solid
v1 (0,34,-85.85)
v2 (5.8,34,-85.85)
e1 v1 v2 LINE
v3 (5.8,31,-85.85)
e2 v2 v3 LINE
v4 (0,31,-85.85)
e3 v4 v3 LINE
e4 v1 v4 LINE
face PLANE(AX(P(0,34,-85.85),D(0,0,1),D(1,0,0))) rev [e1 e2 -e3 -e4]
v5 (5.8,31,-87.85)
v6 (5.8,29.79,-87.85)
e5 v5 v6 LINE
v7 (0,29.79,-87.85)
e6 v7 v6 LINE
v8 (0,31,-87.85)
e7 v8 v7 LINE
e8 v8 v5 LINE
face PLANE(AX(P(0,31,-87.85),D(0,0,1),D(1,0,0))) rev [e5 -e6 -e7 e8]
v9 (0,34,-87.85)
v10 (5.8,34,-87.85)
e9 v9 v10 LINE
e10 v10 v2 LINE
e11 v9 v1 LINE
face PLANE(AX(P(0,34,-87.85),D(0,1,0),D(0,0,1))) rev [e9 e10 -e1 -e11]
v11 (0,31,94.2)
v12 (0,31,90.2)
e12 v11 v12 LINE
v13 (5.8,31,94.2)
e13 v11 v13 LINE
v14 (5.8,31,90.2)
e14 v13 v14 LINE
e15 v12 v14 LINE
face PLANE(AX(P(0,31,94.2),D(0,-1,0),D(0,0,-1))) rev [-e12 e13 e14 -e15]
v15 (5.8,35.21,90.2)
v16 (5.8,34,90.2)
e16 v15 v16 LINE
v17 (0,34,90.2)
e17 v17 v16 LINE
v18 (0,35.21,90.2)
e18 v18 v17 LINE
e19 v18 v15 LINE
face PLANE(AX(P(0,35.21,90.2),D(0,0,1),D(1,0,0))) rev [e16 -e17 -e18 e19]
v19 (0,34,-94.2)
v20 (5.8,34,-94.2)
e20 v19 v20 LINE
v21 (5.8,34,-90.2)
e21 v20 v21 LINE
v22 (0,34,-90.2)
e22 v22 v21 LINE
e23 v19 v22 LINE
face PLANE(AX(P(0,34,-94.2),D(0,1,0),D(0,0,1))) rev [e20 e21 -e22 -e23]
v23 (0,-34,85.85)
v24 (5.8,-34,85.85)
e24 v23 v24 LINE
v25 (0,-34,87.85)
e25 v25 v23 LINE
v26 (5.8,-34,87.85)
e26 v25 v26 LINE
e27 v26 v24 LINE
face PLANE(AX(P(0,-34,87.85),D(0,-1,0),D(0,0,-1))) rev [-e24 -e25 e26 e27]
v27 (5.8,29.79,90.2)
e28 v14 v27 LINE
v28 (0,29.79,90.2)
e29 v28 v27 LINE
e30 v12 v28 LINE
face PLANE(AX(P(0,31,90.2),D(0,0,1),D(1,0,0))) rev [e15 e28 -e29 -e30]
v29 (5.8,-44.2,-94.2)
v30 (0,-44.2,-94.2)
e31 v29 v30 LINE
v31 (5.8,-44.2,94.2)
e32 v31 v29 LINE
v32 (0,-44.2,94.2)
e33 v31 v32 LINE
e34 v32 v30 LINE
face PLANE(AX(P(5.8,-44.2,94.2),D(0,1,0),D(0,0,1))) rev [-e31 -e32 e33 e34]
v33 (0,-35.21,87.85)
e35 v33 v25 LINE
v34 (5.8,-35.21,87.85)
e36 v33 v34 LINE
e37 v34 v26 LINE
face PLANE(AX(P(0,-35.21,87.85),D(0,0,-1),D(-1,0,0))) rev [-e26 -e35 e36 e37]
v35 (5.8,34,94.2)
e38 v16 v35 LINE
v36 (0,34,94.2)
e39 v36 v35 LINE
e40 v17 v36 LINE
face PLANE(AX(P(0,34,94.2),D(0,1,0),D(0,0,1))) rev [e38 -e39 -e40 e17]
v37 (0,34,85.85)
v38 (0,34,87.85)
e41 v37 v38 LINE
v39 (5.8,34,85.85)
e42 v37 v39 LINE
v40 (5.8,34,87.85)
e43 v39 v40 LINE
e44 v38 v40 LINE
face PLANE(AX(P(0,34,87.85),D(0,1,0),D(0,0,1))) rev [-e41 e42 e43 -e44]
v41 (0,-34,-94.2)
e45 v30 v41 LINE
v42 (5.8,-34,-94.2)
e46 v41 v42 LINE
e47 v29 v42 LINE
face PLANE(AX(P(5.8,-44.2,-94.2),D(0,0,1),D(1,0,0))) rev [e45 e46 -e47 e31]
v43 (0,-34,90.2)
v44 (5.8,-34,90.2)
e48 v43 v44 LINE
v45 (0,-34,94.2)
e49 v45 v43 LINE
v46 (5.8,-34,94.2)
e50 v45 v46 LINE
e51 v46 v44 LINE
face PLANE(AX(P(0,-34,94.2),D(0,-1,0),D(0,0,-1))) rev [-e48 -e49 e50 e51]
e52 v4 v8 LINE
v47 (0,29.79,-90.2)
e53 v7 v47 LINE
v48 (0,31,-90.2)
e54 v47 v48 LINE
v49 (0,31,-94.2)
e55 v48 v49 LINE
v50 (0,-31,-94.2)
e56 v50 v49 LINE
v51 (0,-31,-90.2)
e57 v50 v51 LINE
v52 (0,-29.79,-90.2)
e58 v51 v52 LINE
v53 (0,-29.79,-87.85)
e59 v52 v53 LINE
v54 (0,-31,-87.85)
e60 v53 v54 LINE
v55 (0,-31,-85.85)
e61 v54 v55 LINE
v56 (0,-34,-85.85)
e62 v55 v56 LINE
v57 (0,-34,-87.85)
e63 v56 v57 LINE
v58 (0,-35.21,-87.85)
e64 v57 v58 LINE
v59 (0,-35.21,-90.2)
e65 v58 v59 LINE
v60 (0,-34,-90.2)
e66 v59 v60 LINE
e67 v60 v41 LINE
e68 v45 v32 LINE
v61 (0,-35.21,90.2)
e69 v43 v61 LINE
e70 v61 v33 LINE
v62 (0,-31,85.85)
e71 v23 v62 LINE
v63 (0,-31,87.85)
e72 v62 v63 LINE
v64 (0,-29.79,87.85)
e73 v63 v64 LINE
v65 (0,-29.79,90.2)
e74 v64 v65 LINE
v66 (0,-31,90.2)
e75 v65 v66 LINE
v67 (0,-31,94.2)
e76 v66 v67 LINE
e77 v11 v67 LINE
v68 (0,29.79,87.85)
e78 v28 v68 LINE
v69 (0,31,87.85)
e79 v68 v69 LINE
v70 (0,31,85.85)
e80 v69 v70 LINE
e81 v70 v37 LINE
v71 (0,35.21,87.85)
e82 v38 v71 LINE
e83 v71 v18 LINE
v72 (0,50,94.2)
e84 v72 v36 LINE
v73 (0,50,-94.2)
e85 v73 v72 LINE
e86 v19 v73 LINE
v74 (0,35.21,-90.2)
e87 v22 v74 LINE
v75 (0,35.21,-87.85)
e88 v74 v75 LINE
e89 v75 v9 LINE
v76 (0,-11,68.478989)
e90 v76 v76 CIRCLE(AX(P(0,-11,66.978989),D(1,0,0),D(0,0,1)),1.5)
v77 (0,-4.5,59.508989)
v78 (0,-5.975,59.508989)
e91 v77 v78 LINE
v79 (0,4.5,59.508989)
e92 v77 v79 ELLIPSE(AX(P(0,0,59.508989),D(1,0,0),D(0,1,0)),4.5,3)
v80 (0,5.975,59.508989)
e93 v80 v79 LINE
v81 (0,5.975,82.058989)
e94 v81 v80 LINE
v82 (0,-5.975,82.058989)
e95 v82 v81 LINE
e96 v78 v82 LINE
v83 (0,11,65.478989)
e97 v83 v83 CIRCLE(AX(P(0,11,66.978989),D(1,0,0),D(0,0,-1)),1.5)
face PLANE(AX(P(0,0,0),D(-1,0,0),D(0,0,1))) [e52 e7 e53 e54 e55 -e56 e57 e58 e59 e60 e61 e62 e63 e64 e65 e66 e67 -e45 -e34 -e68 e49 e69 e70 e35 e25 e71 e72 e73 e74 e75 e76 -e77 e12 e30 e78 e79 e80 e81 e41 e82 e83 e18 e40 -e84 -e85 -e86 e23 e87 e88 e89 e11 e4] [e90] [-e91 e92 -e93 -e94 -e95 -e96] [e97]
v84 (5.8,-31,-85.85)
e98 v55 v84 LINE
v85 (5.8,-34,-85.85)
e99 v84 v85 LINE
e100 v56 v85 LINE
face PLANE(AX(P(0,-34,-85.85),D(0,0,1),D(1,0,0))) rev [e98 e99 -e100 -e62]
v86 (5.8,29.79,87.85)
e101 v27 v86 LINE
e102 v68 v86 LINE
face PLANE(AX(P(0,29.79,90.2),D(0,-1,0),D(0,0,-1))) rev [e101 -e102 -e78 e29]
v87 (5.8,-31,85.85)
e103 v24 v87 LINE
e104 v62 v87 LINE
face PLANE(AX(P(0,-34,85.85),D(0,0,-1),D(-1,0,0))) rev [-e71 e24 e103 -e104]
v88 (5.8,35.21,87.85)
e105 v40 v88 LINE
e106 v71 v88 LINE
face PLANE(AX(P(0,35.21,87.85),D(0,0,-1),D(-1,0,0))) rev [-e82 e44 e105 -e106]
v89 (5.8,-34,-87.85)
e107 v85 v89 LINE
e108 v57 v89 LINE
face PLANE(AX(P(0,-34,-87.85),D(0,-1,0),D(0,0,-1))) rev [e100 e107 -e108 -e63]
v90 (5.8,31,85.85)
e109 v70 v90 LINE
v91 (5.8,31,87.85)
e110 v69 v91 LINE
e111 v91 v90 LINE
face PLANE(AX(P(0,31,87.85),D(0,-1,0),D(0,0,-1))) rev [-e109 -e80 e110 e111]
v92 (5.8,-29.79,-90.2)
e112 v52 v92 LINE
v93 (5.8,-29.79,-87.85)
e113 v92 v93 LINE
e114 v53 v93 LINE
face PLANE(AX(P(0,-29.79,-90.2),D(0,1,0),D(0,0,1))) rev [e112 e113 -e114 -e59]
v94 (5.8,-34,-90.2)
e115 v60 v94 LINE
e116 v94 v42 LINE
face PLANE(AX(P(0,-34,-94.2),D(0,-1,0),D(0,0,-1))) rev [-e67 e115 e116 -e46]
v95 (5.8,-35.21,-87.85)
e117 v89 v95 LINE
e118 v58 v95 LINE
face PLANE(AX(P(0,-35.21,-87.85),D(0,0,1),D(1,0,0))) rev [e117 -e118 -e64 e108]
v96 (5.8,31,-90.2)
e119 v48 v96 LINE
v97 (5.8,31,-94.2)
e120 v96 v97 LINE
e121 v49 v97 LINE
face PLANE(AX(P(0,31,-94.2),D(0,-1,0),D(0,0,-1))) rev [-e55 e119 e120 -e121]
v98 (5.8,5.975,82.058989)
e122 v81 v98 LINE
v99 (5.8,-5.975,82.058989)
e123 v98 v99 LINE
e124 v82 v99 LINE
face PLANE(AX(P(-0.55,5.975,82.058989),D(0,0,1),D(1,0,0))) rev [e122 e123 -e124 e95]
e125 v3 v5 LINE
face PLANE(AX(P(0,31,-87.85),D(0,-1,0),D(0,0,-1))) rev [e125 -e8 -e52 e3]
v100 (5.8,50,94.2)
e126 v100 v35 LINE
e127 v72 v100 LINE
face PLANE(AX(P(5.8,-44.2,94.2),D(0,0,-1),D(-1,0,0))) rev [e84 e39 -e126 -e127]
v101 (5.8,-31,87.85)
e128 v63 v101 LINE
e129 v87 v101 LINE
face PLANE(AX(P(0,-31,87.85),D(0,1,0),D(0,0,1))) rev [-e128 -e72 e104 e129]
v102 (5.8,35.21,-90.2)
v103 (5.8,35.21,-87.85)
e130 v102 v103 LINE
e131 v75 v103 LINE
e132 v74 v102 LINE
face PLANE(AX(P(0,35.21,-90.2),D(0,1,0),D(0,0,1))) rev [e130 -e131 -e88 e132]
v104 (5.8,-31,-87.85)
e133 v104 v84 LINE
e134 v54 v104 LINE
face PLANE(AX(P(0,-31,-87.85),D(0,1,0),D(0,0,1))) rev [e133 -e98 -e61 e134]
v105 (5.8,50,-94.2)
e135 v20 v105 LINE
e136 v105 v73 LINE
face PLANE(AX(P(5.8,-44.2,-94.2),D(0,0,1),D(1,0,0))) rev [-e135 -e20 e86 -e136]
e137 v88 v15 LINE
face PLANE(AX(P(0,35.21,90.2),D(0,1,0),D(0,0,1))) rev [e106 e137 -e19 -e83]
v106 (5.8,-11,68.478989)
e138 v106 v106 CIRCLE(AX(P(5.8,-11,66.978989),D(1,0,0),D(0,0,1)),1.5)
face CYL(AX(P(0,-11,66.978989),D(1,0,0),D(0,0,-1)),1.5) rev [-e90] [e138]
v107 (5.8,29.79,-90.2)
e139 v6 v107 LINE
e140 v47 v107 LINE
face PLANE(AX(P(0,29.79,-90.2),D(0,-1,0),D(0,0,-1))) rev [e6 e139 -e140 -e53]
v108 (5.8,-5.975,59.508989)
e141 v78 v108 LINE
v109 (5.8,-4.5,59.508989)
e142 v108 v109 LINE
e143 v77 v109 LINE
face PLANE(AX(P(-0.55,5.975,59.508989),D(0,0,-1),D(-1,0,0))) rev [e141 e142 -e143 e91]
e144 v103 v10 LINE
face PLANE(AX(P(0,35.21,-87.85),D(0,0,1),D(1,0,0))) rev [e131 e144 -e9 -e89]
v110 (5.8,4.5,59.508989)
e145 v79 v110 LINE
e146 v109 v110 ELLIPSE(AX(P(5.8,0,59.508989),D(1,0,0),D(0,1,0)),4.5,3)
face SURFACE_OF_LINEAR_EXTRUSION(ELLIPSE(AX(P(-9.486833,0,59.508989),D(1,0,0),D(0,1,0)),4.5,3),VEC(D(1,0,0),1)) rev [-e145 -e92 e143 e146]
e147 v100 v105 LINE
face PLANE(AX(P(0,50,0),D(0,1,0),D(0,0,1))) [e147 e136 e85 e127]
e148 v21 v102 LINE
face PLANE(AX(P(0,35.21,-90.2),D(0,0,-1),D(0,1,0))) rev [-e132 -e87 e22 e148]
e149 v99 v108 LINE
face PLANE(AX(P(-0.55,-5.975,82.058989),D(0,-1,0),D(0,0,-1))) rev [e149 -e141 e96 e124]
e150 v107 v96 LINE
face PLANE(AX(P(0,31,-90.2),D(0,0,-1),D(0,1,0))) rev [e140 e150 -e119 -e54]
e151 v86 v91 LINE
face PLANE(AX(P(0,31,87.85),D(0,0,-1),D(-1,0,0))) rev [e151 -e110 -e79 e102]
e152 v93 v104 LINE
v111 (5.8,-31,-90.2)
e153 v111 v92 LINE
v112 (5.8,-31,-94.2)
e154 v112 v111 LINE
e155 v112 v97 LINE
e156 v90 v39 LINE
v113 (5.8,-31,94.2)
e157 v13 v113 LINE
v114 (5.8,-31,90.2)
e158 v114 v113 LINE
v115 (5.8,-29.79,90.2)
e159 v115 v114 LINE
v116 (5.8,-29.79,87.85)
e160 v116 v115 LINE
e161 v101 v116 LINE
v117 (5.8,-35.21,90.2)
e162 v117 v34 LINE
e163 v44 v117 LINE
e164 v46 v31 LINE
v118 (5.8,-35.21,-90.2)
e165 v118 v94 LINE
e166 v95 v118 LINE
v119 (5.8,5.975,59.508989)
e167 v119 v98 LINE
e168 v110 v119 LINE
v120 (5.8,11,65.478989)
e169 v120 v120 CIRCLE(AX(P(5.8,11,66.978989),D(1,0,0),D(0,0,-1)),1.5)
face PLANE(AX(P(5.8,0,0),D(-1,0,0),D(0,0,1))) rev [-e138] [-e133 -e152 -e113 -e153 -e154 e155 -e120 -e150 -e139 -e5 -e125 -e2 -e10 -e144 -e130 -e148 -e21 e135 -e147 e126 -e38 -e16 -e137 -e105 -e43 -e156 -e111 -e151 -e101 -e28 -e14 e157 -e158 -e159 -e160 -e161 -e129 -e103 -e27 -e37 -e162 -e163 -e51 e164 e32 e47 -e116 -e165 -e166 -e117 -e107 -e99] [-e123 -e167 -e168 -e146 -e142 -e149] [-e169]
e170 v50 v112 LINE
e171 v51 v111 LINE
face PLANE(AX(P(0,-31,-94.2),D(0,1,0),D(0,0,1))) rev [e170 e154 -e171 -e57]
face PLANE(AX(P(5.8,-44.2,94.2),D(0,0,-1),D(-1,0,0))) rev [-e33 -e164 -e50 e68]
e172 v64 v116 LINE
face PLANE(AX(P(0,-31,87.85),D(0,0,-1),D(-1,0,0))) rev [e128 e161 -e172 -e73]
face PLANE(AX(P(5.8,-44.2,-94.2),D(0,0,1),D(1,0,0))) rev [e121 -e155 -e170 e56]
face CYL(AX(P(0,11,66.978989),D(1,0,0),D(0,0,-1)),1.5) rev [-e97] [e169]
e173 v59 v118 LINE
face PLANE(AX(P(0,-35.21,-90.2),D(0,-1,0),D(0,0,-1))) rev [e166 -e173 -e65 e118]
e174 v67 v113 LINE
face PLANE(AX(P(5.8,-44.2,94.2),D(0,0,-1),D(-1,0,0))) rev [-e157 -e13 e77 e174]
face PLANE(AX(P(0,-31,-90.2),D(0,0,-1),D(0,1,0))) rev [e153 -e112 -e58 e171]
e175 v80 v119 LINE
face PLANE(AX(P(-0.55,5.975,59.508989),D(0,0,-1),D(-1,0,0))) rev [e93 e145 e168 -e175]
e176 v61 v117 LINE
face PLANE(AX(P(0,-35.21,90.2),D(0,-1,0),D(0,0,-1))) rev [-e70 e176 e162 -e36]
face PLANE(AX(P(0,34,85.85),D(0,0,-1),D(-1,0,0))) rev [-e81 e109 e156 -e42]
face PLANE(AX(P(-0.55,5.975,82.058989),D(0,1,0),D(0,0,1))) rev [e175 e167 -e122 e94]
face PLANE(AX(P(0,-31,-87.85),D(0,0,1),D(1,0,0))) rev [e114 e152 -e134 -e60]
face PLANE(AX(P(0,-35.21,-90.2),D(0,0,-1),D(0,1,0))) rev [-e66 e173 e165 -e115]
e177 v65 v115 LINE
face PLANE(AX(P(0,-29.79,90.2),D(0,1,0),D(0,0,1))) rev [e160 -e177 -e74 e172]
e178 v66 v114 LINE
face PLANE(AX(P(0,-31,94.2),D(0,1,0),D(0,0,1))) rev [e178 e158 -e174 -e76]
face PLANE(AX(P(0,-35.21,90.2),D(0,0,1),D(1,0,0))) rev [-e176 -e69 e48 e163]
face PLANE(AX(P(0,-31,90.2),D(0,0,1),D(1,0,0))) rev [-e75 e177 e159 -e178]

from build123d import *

# Parameters (mm, degrees)
BOSS_EXTRUDE1_OUTLINE_W   = 188.4
BOSS_EXTRUDE1_OUTLINE_H   = 88.4
BOSS_EXTRUDE1_DEPTH       = 5.8
BOSS_EXTRUDE1_2_OUTLINE_R = 1.5
BOSS_EXTRUDE1_2_OUTLINE_W = 22.55
BOSS_EXTRUDE1_2_OUTLINE_H = 11.95
BOSS_EXTRUDE1_2_DEPTH     = 5.8
SKETCH2_W                 = 22.55
SKETCH2_H                 = 11.95
CUT_EXTRUDE1_DEPTH        = 6.35
SKETCH3_R                 = 1.5
SKETCH3_W                 = 22.55
SKETCH3_H                 = 11.95
CUT_EXTRUDE2_DEPTH        = 107.804868803
CUT_EXTRUDE3_DEPTH        = 107.804868803
SKETCH5_W                 = 5.8
SKETCH5_H                 = 188.4
BOSS_EXTRUDE2_DEPTH       = 5.8
CUT_EXTRUDE5_DEPTH        = 5.8


# Read off the part's stored shape, not the designer's step: Boss-Extrude1
with BuildPart() as part:
    # Boss-Extrude1 outline → Boss-Extrude1 (new body)
    with BuildSketch(Plane(origin=(0, 0, 0), x_dir=(0, 0, -1), z_dir=(1, 0, 0))):
        Rectangle(BOSS_EXTRUDE1_OUTLINE_W, BOSS_EXTRUDE1_OUTLINE_H)
    extrude(amount=BOSS_EXTRUDE1_DEPTH)

    # Sketch2 → Cut-Extrude1 (cut)
    with BuildSketch(Plane(origin=(5.8, 0, 0), x_dir=(0, 0, -1), z_dir=(1, 0, 0))):
        with Locations((-70.783988916, 0)):
            Rectangle(SKETCH2_W, SKETCH2_H)
    extrude(amount=-CUT_EXTRUDE1_DEPTH, mode=Mode.SUBTRACT)

    # Sketch3 → Cut-Extrude2 (cut, through all)
    with BuildSketch(Plane(origin=(5.8, 0, 0), x_dir=(0, 0, -1), z_dir=(1, 0, 0))):
        with Locations((-66.978988916, 11)):
            Circle(SKETCH3_R)
        with Locations(Location((-66.978988916, -11, 0), (0, 0, 180))):
            Circle(SKETCH3_R)
        with Locations((-70.783988916, 0)):
            Rectangle(SKETCH3_W, SKETCH3_H)
    extrude(amount=-CUT_EXTRUDE2_DEPTH, mode=Mode.SUBTRACT)

    # Sketch4 → Cut-Extrude3 (cut, through all)
    with BuildSketch(Plane(origin=(5.8, 0, 0), x_dir=(0, 0, -1), z_dir=(1, 0, 0))):
        Polygon((-94.2, 34), (-90.2, 34), (-90.2, 35.21), (-87.85, 35.21), (-87.85, 34), (-85.85, 34), (-85.85, 31), (-87.85, 31), (-87.85, 29.79), (-90.2, 29.79), (-90.2, 31), (-94.2, 31), align=None)
        Polygon((-87.85, -31), (-87.85, -29.79), (-90.2, -29.79), (-90.2, -31), (-94.2, -31), (-94.2, -34), (-90.2, -34), (-90.2, -35.21), (-87.85, -35.21), (-87.85, -34), (-85.85, -34), (-85.85, -31), align=None)
        Polygon((94.2, -34), (90.2, -34), (90.2, -35.21), (87.85, -35.21), (87.85, -34), (85.85, -34), (85.85, -31), (87.85, -31), (87.85, -29.79), (90.2, -29.79), (90.2, -31), (94.2, -31), align=None)
        Polygon((87.85, 31), (87.85, 29.79), (90.2, 29.79), (90.2, 31), (94.2, 31), (94.2, 34), (90.2, 34), (90.2, 35.21), (87.85, 35.21), (87.85, 34), (85.85, 34), (85.85, 31), align=None)
    extrude(amount=-CUT_EXTRUDE3_DEPTH, mode=Mode.SUBTRACT)



with BuildPart() as body_2:
    # Boss-Extrude1 2 outline → Boss-Extrude1 2 (new body)
    with BuildSketch(Plane(origin=(0, 0, 0), x_dir=(0, 0, -1), z_dir=(1, 0, 0))):
        Polygon((94.2, 34), (94.2, 50), (-94.2, 50), (-94.2, 34), (-90.2, 34), (-90.2, 35.21), (-87.85, 35.21), (-87.85, 34), (-85.85, 34), (-85.85, 31), (-87.85, 31), (-87.85, 29.79), (-90.2, 29.79), (-90.2, 31), (-94.2, 31), (-94.2, -31), (-90.2, -31), (-90.2, -29.79), (-87.85, -29.79), (-87.85, -31), (-85.85, -31), (-85.85, -34), (-87.85, -34), (-87.85, -35.21), (-90.2, -35.21), (-90.2, -34), (-94.2, -34), (-94.2, -44.2), (94.2, -44.2), (94.2, -34), (90.2, -34), (90.2, -35.21), (87.85, -35.21), (87.85, -34), (85.85, -34), (85.85, -31), (87.85, -31), (87.85, -29.79), (90.2, -29.79), (90.2, -31), (94.2, -31), (94.2, 31), (90.2, 31), (90.2, 29.79), (87.85, 29.79), (87.85, 31), (85.85, 31), (85.85, 34), (87.85, 34), (87.85, 35.21), (90.2, 35.21), (90.2, 34), align=None)
        with Locations((-66.978988916, -11)):
            Circle(BOSS_EXTRUDE1_2_OUTLINE_R, mode=Mode.SUBTRACT)
        with Locations((-70.783988916, 0)):
            Rectangle(BOSS_EXTRUDE1_2_OUTLINE_W, BOSS_EXTRUDE1_2_OUTLINE_H, mode=Mode.SUBTRACT)
        with Locations((-66.978988916, 11)):
            Circle(BOSS_EXTRUDE1_2_OUTLINE_R, mode=Mode.SUBTRACT)
    extrude(amount=BOSS_EXTRUDE1_2_DEPTH)


with BuildPart() as part_1:
    add(part.part)

    add(body_2.part)  # Boss-Extrude2 merges body 2
    # Sketch5 → Boss-Extrude2 (add)
    with BuildSketch(Plane(origin=(0, 44.2, 0), x_dir=(1, 0, 0), z_dir=(0, 1, 0))):
        with Locations((2.9, 0)):
            Rectangle(SKETCH5_W, SKETCH5_H)
    extrude(amount=BOSS_EXTRUDE2_DEPTH)

    # Sketch8 → Cut-Extrude5 (cut)
    with BuildSketch(Plane(origin=(5.8, 0, 0), x_dir=(0, 0, -1), z_dir=(1, 0, 0))):
        with BuildLine():
            Line((-59.508988916, 4.5), (-59.508988916, -4.5))
            add(Edge.make_bspline(
                [(-59.508988916, -4.5), (-56.508988916, -4.5), (-56.508988916, 0), (-56.508988916, 4.5), (-59.508988916, 4.5)],
                knots=[3.141592654, 3.141592654, 3.141592654, 4.71238898, 4.71238898, 6.283185307, 6.283185307, 6.283185307], degree=2, weights=[1, 0.707106781, 1, 0.707106781, 1]))
        make_face()
    extrude(amount=-CUT_EXTRUDE5_DEPTH, mode=Mode.SUBTRACT)


solid = part_1.part
